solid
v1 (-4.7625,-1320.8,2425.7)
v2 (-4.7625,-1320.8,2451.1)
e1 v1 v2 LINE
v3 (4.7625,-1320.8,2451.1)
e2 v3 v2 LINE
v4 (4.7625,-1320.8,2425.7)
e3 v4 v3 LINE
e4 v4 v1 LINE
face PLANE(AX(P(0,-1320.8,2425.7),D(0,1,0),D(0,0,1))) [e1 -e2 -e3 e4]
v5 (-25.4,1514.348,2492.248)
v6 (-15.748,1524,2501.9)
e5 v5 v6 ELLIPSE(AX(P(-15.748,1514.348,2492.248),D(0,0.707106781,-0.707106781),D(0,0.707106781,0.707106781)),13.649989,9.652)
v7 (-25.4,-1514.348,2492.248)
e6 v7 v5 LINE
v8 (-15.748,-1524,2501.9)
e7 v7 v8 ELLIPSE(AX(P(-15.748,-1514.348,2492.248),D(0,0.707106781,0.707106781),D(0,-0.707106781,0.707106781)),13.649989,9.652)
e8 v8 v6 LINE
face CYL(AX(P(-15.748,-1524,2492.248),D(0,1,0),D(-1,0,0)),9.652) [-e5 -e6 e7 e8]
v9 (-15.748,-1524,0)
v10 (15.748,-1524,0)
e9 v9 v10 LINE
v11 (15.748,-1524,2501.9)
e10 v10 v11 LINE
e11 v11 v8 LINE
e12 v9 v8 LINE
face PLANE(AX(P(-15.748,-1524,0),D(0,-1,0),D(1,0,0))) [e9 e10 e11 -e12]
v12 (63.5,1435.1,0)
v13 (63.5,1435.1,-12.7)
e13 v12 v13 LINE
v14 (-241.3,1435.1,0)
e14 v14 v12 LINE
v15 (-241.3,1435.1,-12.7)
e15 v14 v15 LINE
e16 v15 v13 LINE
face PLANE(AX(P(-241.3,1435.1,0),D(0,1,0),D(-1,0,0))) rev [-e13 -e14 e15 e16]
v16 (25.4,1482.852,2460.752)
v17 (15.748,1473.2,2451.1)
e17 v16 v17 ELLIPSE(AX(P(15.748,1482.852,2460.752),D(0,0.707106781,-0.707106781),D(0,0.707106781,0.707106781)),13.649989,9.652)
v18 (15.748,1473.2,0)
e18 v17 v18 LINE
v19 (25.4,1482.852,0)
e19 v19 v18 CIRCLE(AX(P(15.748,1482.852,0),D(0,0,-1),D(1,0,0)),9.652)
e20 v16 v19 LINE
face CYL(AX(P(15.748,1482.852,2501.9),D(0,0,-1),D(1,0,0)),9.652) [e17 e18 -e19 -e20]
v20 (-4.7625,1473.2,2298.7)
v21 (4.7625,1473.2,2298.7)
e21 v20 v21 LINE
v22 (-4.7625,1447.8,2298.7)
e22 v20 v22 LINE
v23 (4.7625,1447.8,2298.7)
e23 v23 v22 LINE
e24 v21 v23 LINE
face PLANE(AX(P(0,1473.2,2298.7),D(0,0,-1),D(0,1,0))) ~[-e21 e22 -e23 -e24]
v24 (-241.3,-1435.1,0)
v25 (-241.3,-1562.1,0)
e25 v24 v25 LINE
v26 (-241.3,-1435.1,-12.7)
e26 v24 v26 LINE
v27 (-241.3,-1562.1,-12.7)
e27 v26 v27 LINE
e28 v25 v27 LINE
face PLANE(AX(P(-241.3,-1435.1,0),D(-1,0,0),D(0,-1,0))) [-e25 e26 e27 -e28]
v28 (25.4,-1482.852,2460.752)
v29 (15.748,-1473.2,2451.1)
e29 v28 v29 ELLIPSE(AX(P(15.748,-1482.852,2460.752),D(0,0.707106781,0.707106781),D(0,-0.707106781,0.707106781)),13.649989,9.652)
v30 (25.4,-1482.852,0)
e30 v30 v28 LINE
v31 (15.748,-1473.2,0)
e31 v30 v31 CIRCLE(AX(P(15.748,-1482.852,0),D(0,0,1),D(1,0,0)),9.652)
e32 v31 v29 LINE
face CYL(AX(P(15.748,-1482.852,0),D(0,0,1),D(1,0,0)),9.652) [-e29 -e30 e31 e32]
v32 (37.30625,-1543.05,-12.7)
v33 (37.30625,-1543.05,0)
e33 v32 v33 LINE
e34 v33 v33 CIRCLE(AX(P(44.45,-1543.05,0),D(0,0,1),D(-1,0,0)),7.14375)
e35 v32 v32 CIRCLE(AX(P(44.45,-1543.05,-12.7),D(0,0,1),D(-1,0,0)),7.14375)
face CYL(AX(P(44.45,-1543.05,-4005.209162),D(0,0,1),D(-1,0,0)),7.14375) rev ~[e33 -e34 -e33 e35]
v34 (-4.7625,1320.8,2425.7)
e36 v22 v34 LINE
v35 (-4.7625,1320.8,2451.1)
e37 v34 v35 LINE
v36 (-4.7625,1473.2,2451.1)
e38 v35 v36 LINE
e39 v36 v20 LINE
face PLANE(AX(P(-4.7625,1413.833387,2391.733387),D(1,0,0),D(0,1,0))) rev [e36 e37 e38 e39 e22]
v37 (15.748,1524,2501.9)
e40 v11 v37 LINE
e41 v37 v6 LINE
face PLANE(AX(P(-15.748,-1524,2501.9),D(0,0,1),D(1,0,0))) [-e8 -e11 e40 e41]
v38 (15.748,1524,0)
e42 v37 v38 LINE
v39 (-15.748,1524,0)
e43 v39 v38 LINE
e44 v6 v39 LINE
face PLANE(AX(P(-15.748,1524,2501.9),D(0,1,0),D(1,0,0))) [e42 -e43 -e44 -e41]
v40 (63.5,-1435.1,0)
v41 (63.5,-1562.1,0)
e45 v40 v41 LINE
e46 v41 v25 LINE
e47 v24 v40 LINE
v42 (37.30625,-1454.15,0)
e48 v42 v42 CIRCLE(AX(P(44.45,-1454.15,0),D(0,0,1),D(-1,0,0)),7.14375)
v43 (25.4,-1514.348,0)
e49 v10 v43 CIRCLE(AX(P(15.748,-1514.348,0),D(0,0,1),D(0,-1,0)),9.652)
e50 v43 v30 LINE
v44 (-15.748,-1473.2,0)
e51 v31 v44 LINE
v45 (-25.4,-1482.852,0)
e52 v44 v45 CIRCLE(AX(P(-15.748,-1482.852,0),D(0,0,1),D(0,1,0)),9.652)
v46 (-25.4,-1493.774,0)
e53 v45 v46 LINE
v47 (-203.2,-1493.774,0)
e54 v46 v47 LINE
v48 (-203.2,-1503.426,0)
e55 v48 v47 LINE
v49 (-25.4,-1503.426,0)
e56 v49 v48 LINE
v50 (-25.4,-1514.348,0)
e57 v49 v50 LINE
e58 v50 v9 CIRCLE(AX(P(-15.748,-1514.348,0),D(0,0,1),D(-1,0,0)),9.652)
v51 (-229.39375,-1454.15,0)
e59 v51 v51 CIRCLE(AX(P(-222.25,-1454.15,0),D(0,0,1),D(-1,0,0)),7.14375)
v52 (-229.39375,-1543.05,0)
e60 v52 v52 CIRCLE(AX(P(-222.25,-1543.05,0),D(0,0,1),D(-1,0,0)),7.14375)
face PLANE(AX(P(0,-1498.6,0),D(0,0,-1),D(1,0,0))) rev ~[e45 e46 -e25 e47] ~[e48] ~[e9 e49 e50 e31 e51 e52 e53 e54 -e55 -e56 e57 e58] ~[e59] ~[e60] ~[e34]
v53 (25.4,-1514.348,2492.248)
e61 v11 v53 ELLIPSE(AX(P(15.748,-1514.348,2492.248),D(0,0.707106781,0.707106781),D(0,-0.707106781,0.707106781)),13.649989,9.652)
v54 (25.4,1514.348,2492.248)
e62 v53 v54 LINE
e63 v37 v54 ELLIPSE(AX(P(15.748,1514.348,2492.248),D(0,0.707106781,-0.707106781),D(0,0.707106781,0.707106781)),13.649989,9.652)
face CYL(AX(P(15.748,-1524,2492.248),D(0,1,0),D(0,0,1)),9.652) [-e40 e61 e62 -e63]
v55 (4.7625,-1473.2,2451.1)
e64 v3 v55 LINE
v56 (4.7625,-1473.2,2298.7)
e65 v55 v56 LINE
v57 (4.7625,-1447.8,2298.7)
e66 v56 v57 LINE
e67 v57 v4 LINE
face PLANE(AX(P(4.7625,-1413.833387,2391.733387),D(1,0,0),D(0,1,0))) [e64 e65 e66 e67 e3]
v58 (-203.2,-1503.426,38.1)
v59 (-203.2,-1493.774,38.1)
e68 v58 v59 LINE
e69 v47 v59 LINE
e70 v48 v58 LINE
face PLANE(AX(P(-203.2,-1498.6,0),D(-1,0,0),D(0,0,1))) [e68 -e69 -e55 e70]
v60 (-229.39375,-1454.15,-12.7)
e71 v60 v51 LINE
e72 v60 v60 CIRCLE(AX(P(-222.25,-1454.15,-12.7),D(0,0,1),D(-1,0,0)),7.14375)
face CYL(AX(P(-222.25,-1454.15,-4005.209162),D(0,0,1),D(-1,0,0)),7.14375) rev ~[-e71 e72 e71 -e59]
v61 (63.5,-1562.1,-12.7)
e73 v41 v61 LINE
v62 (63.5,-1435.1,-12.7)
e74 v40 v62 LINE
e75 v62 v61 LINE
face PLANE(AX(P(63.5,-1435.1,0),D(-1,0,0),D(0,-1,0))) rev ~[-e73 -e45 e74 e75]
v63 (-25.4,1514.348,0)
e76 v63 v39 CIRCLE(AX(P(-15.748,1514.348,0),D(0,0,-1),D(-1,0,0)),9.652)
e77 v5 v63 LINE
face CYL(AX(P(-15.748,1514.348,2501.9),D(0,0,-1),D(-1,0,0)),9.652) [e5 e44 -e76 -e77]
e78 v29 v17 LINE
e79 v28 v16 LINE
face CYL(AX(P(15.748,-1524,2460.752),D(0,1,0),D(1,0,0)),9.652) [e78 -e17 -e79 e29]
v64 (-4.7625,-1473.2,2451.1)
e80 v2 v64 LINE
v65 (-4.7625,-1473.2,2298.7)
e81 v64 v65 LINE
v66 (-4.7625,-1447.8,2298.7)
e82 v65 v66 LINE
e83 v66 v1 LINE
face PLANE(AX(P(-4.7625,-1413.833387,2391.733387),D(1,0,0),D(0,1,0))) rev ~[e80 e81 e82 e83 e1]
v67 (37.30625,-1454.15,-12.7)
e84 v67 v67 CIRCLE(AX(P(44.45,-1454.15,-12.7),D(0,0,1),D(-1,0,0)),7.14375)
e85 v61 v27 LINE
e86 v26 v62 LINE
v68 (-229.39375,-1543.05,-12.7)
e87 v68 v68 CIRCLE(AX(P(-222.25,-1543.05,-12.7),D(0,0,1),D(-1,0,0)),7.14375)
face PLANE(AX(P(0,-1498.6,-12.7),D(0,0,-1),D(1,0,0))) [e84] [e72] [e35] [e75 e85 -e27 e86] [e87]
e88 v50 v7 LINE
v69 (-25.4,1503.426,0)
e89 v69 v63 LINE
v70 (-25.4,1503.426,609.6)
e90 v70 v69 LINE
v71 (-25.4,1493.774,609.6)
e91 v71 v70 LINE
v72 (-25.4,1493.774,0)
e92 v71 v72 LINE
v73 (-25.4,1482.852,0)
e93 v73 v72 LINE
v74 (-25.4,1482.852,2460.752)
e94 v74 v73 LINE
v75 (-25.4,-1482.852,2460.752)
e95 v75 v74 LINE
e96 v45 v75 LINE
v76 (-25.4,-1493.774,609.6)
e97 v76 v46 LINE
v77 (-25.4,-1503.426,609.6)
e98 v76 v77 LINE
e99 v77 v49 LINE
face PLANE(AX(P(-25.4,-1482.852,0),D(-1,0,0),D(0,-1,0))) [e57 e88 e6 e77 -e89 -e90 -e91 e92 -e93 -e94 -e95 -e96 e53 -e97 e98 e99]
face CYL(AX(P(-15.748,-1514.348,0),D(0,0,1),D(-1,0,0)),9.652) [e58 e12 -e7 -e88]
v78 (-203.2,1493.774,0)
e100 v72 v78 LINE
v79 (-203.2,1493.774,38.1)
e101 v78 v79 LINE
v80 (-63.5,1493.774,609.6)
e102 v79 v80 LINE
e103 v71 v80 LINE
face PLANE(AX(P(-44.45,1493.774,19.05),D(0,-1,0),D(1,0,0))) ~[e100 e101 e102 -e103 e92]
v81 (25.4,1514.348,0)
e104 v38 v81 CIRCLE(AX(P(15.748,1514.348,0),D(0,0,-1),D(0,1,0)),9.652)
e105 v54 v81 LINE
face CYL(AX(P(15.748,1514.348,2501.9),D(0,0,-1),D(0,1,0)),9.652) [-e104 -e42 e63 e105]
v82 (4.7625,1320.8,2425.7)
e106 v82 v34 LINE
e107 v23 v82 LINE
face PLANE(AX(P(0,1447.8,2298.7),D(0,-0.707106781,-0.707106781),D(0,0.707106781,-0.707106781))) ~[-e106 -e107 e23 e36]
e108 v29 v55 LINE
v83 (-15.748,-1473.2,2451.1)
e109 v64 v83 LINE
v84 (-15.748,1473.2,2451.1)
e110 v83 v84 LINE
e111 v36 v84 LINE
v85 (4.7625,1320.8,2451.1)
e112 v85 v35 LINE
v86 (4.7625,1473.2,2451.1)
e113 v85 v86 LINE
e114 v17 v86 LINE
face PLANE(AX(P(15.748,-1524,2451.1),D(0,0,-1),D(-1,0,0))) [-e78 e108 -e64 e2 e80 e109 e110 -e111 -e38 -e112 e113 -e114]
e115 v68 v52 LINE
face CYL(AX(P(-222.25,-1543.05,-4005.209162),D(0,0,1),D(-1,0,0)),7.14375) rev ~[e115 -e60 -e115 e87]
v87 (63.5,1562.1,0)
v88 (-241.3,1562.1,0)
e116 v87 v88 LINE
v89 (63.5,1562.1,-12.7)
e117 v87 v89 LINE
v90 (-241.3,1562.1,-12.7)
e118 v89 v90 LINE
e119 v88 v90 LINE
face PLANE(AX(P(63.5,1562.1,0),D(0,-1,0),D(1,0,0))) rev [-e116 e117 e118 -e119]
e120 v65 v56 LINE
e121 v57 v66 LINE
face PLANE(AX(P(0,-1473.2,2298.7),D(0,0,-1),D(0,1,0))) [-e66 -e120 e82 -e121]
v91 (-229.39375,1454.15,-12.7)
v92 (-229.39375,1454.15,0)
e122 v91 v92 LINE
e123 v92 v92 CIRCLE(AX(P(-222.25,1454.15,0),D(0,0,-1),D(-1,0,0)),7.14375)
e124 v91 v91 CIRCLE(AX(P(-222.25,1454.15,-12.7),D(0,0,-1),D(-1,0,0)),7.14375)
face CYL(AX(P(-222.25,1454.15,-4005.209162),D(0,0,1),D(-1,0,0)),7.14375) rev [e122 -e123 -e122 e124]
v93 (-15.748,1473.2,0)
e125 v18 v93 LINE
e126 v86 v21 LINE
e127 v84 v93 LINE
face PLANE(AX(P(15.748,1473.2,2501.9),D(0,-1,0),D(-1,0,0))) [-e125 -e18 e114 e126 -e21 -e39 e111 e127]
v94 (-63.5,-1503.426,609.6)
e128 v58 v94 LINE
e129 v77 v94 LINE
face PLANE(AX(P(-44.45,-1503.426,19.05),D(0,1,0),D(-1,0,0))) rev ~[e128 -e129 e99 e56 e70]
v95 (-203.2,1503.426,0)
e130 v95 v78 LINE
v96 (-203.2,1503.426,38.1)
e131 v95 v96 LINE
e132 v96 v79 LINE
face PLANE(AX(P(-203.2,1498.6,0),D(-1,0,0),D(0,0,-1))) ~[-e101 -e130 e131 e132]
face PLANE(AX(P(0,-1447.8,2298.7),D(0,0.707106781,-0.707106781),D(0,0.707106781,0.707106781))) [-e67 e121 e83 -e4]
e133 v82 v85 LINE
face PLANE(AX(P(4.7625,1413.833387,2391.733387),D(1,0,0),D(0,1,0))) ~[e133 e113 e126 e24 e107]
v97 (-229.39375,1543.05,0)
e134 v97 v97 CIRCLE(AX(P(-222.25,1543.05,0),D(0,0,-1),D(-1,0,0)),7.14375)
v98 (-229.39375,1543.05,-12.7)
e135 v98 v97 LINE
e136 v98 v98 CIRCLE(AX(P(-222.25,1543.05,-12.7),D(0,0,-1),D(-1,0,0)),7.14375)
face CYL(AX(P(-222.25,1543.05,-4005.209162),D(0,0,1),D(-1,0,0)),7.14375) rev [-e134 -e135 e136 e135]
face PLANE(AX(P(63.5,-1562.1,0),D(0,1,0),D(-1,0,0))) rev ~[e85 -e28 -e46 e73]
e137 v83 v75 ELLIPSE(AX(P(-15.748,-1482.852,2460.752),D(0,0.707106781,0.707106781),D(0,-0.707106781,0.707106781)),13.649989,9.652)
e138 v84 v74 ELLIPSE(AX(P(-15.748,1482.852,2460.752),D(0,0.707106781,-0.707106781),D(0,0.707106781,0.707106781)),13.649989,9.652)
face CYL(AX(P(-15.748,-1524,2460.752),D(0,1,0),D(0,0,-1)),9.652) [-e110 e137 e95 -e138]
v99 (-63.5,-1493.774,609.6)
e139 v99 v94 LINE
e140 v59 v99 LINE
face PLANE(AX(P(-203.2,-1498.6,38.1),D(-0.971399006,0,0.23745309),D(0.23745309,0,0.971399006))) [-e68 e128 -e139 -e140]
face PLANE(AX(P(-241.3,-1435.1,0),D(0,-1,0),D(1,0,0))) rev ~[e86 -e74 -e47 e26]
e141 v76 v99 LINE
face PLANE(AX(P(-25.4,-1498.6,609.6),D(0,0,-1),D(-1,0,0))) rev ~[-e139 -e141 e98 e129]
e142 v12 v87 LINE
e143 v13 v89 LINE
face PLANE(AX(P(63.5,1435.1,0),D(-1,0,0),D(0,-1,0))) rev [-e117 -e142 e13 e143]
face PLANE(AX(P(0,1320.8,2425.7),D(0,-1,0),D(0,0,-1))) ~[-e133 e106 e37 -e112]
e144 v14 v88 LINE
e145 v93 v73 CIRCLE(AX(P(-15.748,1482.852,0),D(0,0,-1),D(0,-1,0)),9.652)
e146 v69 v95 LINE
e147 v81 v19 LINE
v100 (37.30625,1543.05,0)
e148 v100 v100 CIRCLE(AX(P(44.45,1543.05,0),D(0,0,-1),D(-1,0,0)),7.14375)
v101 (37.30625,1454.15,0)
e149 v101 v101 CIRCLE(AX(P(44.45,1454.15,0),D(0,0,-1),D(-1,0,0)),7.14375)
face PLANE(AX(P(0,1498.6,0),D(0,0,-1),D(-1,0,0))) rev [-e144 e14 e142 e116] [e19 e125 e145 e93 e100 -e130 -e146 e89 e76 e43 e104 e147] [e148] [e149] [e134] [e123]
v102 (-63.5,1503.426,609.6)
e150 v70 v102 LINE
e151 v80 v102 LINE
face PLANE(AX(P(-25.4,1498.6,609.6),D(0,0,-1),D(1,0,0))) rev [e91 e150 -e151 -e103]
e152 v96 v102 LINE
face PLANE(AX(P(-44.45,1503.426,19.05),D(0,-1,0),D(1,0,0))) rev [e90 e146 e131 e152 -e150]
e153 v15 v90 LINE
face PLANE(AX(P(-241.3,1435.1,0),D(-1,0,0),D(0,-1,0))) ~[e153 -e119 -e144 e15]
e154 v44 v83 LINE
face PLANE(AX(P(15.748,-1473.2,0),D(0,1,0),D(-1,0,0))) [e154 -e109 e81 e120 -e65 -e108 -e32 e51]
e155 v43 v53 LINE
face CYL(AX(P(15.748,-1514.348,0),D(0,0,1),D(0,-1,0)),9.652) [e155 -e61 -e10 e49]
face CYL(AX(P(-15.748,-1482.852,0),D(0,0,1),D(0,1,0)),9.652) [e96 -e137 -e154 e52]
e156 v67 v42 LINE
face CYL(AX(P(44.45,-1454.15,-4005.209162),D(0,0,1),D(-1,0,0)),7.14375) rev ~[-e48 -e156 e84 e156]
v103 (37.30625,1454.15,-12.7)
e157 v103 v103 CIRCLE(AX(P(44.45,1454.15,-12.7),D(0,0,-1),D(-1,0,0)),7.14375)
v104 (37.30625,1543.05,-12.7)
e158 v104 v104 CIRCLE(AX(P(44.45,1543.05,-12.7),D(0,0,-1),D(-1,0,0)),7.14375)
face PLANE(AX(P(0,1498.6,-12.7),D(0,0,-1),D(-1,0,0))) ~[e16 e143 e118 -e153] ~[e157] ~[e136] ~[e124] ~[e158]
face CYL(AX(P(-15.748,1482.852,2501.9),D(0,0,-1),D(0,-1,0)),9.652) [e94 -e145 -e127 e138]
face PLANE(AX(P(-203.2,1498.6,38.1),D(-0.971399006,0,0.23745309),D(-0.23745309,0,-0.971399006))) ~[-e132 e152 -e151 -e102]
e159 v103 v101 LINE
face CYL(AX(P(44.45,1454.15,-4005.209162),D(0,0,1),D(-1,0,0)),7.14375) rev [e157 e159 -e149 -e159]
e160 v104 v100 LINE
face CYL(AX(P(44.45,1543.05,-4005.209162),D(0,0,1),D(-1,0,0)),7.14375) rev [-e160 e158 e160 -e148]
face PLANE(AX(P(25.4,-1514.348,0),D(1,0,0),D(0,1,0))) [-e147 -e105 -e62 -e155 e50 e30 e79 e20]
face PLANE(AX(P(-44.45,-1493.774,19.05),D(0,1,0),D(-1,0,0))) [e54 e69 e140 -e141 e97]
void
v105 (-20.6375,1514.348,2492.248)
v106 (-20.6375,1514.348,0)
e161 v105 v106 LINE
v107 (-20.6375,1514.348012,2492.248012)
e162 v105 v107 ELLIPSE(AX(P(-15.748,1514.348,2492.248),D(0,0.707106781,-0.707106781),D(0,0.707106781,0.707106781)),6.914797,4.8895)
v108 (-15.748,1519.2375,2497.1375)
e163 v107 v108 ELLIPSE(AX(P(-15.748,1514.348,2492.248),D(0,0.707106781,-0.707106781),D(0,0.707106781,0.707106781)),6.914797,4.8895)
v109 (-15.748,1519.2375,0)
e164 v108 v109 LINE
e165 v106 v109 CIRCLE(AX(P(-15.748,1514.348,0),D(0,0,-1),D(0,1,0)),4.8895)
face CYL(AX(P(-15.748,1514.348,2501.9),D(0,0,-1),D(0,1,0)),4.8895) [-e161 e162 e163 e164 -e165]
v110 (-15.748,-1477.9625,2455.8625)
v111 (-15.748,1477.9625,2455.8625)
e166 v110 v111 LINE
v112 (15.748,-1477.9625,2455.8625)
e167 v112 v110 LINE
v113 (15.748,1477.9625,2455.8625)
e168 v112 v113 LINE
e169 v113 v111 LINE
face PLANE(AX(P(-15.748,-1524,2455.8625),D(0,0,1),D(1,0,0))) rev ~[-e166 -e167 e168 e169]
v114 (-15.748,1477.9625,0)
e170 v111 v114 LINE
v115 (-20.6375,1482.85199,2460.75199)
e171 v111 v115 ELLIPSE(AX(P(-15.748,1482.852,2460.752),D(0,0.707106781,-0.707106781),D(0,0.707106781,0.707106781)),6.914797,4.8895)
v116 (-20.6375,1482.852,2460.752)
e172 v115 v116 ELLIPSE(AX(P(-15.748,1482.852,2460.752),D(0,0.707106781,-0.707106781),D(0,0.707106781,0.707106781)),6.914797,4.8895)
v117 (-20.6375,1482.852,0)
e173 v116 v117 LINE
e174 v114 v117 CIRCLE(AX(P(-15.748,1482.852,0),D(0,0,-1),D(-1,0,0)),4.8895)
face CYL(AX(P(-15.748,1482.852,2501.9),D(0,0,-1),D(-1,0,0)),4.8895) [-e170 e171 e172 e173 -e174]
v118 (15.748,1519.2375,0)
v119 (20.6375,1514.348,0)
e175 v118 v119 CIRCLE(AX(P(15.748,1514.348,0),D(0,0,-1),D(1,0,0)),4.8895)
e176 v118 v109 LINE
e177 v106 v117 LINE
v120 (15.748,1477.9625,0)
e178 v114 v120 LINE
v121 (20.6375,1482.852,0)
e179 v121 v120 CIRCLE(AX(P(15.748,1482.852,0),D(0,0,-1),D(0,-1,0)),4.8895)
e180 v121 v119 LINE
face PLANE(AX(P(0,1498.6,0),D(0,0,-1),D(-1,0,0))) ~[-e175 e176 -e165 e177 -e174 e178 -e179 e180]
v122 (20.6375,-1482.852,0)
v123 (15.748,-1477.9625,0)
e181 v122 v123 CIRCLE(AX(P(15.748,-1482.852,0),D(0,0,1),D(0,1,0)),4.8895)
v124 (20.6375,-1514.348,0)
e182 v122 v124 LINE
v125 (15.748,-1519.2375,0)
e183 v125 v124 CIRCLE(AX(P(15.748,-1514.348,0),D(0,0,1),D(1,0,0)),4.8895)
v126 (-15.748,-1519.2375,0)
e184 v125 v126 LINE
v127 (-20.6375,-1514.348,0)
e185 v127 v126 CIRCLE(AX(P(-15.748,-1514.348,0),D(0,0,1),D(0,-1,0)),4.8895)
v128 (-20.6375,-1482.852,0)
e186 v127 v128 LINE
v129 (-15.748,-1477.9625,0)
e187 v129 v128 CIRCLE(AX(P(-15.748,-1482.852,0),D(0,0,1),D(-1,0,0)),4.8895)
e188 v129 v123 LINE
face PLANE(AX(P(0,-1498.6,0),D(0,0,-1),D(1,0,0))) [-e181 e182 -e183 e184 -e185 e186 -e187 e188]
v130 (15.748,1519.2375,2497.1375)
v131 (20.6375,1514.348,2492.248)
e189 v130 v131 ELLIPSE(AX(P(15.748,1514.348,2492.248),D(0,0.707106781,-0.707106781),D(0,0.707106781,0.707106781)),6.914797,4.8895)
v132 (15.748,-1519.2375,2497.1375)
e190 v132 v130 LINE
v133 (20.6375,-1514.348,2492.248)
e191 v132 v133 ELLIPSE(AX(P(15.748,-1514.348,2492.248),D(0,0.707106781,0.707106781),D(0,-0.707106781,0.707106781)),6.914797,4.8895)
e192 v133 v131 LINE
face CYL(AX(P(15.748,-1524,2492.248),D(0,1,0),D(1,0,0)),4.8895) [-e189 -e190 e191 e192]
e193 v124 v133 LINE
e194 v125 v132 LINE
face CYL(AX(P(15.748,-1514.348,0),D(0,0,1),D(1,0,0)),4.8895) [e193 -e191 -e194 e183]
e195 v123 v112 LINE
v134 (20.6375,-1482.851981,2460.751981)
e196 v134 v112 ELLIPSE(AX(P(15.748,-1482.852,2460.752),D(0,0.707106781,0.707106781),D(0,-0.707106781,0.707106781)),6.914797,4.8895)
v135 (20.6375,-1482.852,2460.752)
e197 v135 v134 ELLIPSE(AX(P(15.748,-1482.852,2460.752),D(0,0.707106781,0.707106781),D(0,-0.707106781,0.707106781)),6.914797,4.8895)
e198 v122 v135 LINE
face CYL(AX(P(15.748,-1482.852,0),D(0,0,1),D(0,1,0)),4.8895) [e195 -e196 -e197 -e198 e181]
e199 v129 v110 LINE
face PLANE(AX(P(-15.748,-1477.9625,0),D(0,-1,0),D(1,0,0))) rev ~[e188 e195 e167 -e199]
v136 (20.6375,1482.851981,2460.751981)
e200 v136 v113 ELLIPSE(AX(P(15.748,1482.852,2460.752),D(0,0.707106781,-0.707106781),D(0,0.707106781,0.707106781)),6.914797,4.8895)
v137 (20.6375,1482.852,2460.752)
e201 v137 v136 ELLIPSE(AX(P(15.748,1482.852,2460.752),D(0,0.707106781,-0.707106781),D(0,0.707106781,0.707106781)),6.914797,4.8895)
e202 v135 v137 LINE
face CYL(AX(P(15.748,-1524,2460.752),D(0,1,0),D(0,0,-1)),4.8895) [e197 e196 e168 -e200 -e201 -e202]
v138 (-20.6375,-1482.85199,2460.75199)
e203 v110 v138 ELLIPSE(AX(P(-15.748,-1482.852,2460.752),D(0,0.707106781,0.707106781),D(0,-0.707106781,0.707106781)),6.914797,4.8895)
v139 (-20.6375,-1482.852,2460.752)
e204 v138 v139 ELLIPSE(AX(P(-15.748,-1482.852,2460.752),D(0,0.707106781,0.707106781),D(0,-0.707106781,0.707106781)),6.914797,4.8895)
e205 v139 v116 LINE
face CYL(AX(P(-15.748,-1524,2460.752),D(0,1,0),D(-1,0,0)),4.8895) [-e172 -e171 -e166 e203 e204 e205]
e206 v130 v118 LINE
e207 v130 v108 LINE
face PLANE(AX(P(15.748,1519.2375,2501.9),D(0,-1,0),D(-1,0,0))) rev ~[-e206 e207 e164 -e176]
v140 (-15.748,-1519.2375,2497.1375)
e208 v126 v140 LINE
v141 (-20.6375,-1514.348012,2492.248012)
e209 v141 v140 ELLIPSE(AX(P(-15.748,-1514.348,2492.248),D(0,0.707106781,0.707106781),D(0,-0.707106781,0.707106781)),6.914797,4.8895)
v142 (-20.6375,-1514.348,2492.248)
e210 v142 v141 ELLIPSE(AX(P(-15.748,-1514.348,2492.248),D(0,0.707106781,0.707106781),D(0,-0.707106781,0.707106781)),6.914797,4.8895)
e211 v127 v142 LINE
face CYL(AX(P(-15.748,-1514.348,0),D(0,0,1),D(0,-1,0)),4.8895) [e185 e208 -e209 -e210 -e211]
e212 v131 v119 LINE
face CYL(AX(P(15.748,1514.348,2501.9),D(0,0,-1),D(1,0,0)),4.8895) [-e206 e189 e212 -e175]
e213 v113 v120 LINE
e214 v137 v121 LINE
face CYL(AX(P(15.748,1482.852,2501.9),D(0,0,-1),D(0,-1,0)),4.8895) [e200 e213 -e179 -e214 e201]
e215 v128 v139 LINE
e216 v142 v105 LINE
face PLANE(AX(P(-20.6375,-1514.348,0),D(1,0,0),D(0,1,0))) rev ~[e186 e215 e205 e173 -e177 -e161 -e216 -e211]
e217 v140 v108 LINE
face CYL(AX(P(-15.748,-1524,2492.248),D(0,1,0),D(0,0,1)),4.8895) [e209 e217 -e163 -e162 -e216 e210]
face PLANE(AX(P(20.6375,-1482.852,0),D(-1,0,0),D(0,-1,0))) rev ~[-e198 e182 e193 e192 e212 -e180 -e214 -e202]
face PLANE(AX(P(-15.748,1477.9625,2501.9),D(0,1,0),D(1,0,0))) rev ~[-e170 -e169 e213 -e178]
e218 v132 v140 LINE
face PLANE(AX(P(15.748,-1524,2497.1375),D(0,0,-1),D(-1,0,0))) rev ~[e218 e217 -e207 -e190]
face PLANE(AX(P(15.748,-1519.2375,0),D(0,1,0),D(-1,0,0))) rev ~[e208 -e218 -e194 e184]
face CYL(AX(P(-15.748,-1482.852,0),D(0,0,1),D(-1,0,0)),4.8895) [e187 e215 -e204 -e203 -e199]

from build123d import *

# Parameters (mm, degrees)
F3_W      = 127
F3_H      = 127
F3_W_2    = 177.8
F4_DEPTH  = 12.7
F6_W      = 38.1
F6_H      = 38.1
F6_W_2    = 139.7
F6_H_2    = 571.5
F7_DEPTH  = 4.826
F9_D      = 14.2875
F13_DEPTH = 4.7625


# Not quite as in the source:
# - a length typed as a fraction of an inch, garbled in the dataset ("3 / 203.2 mm" for 3/8 in), is restored


with BuildPart() as f2:
    # F2: sweep along a path in F0
    with BuildLine(Plane.YZ) as f2_path:
        Line((-1524, 0), (-1524, 2501.9))
        Line((-1524, 2501.9), (1524, 2501.9))
        Line((1524, 2501.9), (1524, 0))
    # F1 (on Top) → F2 (sweep)
    with BuildSketch(Plane.XY):
        with BuildLine():
            Line((-15.748, -1524), (0, -1524))
            Line((0, -1524), (15.748, -1524))
            ThreePointArc((15.748, -1524), (22.572994652, -1521.172994652), (25.4, -1514.348))
            Line((25.4, -1514.348), (25.4, -1482.852))
            ThreePointArc((25.4, -1482.852), (22.572994652, -1476.027005348), (15.748, -1473.2))
            Line((15.748, -1473.2), (-15.748, -1473.2))
            ThreePointArc((-15.748, -1473.2), (-22.572994652, -1476.027005348), (-25.4, -1482.852))
            Line((-25.4, -1482.852), (-25.4, -1514.348))
            ThreePointArc((-25.4, -1514.348), (-22.572994652, -1521.172994652), (-15.748, -1524))
        make_face()
        with BuildLine():
            Line((0, -1519.2375), (-15.748, -1519.2375))
            ThreePointArc((-15.748, -1519.2375), (-19.2053986066, -1517.8053986066), (-20.6375, -1514.348))
            Line((-20.6375, -1514.348), (-20.6375, -1482.852))
            ThreePointArc((-20.6375, -1482.852), (-19.2053986066, -1479.3946013934), (-15.748, -1477.9625))
            Line((-15.748, -1477.9625), (15.748, -1477.9625))
            ThreePointArc((15.748, -1477.9625), (19.2053986066, -1479.3946013934), (20.6375, -1482.852))
            Line((20.6375, -1482.852), (20.6375, -1514.348))
            ThreePointArc((20.6375, -1514.348), (19.2053986066, -1517.8053986066), (15.748, -1519.2375))
            Line((15.748, -1519.2375), (0, -1519.2375))
        make_face(mode=Mode.SUBTRACT)
    sweep(path=f2_path.line, transition=Transition.RIGHT)

    # F3 (on face) → F4 (join)
    with BuildSketch(Plane(origin=(0, 0, 0), x_dir=(1, 0, 0), z_dir=(0, 0, -1))):
        with Locations((0, 1498.6)):
            Rectangle(F3_W, F3_H)
        with Locations((-152.4, 1498.6)):
            Rectangle(F3_W_2, F3_H)
    extrude(amount=F4_DEPTH)

    # F6 (on mid) → F7 (join, symmetric)
    with BuildSketch(Plane(origin=(0, -1498.6, 0), x_dir=(-1, 0, 0), z_dir=(0, 1, 0))):
        with Locations((44.45, 19.05)):
            Rectangle(F6_W, F6_H)
        with Locations((133.35, 19.05)):
            Rectangle(F6_W_2, F6_H)
        with Locations((44.45, 323.85)):
            Rectangle(F6_W, F6_H_2)
        Polygon((63.5, 609.6), (63.5, 38.1), (203.2, 38.1), align=None)
    extrude(amount=F7_DEPTH, both=True)

    # F9 (through all)
    with Locations(Plane(origin=(0, 0, -12.7), x_dir=(1, 0, 0), z_dir=(0, 0, -1))):
        with Locations((-222.25, 1454.15), (-222.25, 1543.05), (44.45, 1543.05), (44.45, 1454.15)):
            Hole(F9_D / 2)

    # F10: F2 across plane


with BuildPart() as f2_1:
    add(f2.part)
    add(f2.part.mirror(Plane.XZ))

    # F12 (on mid) → F13 (join, symmetric)
    with BuildSketch(Plane.YZ):
        Polygon((-1320.8, 2451.1), (-1473.2, 2451.1), (-1473.2, 2298.7), (-1447.8, 2298.7), (-1320.8, 2425.7), align=None)
    extrude(amount=F13_DEPTH, both=True)

    # F14: F2 across plane


with BuildPart() as f2_2:
    add(f2_1.part)
    add(f2_1.part.mirror(Plane.XZ))


solid = f2_2.part
